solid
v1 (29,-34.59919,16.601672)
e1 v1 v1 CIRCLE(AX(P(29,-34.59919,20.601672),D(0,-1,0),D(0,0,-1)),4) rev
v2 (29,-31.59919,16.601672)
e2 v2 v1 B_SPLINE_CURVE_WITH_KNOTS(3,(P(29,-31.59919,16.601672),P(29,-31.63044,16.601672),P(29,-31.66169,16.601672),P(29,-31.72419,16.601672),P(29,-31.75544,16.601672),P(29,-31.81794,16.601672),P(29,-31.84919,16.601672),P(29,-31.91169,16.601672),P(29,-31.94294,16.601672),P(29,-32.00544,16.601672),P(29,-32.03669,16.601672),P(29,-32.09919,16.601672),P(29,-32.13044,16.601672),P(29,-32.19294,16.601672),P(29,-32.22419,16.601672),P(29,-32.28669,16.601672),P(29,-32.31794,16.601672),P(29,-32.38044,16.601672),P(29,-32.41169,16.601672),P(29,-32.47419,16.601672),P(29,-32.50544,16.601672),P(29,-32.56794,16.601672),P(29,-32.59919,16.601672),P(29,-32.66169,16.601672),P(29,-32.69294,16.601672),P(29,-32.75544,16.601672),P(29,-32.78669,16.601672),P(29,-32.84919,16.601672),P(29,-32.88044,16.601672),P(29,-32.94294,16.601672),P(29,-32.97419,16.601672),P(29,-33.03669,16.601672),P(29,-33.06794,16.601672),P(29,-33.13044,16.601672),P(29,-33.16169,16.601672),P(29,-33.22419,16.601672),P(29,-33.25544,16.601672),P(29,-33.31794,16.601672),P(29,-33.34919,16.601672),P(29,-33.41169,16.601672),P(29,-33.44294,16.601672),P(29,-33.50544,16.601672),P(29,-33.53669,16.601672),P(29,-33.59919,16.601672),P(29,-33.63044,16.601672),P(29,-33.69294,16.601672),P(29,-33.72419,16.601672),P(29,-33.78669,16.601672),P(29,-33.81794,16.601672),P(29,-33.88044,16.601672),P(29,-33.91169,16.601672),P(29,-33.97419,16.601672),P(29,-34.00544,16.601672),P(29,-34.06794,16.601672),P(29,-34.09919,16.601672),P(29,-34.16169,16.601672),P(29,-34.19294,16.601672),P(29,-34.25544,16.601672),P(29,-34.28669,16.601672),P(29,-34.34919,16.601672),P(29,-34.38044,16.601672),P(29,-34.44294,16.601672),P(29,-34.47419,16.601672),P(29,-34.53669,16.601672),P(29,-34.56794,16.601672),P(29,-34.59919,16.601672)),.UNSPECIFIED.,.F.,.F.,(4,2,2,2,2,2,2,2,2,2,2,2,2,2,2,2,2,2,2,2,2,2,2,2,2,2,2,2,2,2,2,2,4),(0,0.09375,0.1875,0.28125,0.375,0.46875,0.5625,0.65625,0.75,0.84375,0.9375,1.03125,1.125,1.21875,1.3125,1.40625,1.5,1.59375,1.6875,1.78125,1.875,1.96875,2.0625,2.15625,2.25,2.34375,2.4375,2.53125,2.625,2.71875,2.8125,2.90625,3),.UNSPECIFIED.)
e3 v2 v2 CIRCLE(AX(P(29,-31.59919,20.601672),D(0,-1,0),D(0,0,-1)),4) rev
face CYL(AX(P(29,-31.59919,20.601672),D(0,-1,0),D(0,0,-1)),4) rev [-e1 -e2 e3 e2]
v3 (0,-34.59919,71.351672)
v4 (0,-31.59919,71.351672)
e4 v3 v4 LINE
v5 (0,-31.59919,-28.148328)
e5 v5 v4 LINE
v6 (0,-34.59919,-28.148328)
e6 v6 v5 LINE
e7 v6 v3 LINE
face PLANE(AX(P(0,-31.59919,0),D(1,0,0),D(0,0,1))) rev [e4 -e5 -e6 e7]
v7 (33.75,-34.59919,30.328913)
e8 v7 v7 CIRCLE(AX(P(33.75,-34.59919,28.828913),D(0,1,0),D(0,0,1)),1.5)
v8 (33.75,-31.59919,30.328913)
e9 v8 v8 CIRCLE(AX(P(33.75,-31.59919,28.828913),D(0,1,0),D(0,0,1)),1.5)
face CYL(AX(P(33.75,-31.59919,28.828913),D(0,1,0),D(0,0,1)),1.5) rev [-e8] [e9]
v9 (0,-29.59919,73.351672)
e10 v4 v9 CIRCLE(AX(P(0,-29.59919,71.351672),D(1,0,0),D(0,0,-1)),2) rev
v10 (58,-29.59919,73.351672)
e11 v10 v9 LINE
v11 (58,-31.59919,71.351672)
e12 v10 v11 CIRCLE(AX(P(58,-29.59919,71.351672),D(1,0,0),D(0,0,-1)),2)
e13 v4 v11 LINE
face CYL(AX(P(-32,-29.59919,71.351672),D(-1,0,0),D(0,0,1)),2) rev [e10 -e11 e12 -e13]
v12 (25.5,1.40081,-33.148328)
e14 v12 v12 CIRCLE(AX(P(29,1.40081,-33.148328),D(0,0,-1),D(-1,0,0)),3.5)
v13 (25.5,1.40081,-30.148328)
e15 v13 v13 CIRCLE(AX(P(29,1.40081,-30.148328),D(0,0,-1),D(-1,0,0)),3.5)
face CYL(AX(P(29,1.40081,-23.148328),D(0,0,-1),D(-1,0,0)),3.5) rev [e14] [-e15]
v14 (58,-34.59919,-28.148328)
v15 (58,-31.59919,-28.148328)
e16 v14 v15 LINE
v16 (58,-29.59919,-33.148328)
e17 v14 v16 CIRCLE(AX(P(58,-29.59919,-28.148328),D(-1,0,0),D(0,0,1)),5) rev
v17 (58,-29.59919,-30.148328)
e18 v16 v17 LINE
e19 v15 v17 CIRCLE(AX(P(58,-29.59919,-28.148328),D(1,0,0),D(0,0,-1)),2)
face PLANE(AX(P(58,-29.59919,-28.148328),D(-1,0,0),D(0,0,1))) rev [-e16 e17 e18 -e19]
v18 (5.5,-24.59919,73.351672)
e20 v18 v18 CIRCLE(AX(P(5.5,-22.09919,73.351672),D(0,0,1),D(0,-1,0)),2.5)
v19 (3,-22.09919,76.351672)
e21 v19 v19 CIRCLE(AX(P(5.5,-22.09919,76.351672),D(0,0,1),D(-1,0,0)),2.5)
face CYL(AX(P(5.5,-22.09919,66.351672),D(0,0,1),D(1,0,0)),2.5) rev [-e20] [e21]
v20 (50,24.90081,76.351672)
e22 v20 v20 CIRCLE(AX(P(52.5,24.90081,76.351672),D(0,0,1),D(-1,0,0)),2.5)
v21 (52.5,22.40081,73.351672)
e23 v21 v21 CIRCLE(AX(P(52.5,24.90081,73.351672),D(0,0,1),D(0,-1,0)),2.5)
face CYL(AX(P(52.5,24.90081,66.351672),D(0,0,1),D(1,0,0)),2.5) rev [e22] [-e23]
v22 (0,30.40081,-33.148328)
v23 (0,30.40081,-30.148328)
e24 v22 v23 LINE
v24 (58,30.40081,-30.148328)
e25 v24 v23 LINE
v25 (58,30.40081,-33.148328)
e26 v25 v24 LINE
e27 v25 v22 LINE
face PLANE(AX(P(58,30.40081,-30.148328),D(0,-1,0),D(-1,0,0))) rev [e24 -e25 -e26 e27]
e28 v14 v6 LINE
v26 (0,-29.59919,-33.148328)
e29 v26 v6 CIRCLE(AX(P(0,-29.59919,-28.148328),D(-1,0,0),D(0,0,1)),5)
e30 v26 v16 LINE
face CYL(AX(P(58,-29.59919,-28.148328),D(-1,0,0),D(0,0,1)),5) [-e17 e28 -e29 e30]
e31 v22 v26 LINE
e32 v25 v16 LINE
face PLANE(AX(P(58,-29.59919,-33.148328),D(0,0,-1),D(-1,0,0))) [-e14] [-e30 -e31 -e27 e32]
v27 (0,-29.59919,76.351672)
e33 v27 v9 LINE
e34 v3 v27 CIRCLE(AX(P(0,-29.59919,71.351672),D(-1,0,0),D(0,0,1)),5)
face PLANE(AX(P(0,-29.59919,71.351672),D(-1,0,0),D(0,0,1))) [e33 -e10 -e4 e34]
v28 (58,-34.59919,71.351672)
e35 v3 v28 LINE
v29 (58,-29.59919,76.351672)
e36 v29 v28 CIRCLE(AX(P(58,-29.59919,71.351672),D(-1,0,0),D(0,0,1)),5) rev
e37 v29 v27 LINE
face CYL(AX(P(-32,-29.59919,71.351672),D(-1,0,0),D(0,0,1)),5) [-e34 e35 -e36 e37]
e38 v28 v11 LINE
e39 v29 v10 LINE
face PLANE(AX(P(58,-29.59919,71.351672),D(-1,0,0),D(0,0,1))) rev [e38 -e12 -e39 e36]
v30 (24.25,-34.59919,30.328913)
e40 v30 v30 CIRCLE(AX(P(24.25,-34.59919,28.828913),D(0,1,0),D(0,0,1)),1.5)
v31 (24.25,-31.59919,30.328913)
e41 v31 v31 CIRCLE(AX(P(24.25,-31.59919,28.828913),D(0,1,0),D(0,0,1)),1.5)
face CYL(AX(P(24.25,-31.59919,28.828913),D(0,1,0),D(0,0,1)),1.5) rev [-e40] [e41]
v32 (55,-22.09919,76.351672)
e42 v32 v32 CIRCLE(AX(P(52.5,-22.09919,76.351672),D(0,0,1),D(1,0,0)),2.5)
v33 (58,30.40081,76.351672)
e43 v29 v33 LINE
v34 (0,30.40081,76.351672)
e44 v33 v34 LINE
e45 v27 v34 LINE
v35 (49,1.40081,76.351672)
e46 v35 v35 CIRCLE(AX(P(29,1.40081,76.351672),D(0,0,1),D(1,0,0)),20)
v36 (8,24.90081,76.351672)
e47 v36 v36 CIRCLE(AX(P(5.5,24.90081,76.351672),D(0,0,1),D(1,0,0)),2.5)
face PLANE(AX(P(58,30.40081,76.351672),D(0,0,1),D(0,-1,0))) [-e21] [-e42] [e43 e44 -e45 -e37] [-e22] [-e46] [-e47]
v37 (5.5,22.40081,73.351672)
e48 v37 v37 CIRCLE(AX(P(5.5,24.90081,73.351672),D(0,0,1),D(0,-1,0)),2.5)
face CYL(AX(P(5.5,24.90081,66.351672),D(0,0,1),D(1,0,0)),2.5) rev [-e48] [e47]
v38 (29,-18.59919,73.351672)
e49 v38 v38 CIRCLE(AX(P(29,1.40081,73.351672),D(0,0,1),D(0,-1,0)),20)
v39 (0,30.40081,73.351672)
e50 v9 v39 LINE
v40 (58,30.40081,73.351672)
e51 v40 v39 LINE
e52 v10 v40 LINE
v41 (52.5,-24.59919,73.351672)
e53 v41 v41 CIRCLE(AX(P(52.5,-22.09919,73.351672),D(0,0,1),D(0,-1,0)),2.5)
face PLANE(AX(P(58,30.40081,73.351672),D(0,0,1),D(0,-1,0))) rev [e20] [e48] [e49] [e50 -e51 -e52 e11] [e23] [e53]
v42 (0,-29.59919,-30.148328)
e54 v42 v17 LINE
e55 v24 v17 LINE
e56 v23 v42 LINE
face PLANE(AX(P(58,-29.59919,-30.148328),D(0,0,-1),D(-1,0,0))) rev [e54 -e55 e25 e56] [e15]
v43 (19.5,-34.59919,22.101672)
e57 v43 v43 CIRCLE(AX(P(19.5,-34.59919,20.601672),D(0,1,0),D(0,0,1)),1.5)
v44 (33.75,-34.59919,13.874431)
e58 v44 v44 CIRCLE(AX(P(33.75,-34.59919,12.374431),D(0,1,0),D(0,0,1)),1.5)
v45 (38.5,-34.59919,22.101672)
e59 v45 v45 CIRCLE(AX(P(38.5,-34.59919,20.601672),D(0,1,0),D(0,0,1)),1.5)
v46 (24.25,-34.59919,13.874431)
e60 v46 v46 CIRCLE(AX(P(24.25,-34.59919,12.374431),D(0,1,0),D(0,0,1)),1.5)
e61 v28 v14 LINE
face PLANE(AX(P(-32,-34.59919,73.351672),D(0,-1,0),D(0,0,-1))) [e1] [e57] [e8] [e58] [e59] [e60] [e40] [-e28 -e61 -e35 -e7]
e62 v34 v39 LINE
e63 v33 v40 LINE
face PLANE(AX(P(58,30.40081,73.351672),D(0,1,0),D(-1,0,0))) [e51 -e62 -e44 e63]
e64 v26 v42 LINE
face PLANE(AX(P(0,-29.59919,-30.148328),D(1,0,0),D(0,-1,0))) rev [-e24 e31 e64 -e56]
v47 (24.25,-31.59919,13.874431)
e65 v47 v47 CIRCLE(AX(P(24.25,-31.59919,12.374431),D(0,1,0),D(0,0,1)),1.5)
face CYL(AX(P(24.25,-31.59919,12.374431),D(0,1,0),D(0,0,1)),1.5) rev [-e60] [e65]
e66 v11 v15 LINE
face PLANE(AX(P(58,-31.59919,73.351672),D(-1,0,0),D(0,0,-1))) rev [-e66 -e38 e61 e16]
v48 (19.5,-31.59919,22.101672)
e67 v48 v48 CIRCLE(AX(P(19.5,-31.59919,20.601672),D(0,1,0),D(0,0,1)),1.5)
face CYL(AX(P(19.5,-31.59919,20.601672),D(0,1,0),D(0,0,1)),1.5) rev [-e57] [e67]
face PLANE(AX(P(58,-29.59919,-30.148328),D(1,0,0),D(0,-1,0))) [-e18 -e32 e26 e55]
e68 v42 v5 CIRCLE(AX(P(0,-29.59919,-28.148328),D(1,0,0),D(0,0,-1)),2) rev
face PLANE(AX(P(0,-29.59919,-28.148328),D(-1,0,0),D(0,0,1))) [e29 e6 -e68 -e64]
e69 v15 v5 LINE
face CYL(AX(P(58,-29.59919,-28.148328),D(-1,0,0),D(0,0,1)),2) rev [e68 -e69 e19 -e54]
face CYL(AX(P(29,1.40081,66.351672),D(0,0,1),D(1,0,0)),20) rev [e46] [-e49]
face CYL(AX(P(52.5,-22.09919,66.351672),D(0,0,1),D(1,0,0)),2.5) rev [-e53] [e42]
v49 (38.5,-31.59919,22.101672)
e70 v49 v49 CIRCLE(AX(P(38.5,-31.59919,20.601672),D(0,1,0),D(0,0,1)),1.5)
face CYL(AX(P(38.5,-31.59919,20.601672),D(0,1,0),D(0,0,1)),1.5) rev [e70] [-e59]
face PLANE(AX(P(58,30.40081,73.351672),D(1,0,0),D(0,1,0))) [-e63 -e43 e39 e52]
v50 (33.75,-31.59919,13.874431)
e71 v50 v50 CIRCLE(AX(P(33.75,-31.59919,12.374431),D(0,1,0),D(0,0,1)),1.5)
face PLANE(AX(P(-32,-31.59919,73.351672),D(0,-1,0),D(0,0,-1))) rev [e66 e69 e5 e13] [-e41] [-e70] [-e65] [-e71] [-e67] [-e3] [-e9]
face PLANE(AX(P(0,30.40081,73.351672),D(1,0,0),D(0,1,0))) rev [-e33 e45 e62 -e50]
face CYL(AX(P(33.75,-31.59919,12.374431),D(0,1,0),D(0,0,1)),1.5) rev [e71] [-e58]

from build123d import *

# Parameters (mm, degrees)
BOSS_EXTRUDE1_DEPTH    = 58
SKETCH25_R             = 4
CUT_EXTRUDE6_DEPTH     = 10
SKETCH26_W             = 103.5
SKETCH26_H             = 2
CUT_EXTRUDE7_DEPTH     = 90
SKETCH29_R             = 1.5
CUT_EXTRUDE8_DEPTH     = 10
CONVERT_SOLID1_DEPTH   = 58
CONVERT_SOLID1_2_DEPTH = 58
SKETCH2_R              = 2.5
SKETCH2_R_2            = 20
CUT_EXTRUDE10_DEPTH    = 10
SKETCH30_R             = 3.5
CUT_EXTRUDE11_DEPTH    = 10


# Read off the part's stored shape, not the designer's step: Convert-Solid1
with BuildPart() as part:
    # Sketch1 → Boss-Extrude1 (new body)
    with BuildSketch(Plane(origin=(0, 0, 0), x_dir=(0, 0, -1), z_dir=(1, 0, 0))):
        Polygon((-73.351671883, 30.400809615), (-73.351671883, -29.599190385), (30.148328117, -29.599190385), (30.148328117, 30.400809615), (33.148328117, 30.400809615), (33.148328117, -34.599190385), (-76.351671883, -34.599190385), (-76.351671883, 30.400809615), align=None)
    extrude(amount=BOSS_EXTRUDE1_DEPTH)

    # Sketch25 → Cut-Extrude6 (cut)
    with BuildSketch(Plane.XZ.offset(34.599190385)):
        with Locations(Location((29, 20.601671883, 0), (0, 0, 270))):
            Circle(SKETCH25_R)
    extrude(amount=-CUT_EXTRUDE6_DEPTH, mode=Mode.SUBTRACT)

    # Sketch26 → Cut-Extrude7 (cut)
    with BuildSketch(Plane(origin=(58, 0, 0), x_dir=(0, 0, -1), z_dir=(1, 0, 0))):
        with Locations((-21.601671883, -30.599190385)):
            Rectangle(SKETCH26_W, SKETCH26_H)
    extrude(amount=-CUT_EXTRUDE7_DEPTH, mode=Mode.SUBTRACT)

    # Sketch29 → Cut-Extrude8 (cut)
    with BuildSketch(Plane(origin=(0, -31.599190385, 0), x_dir=(1, 0, 0), z_dir=(0, 1, 0))):
        with Locations(Location((19.5, -20.601671883, 0), (0, 0, 270))):
            Circle(SKETCH29_R)
        with Locations(Location((24.25, -12.374430547, 0), (0, 0, 270))):
            Circle(SKETCH29_R)
        with Locations(Location((33.75, -12.374430547, 0), (0, 0, 270))):
            Circle(SKETCH29_R)
        with Locations(Location((38.5, -20.601671883, 0), (0, 0, 270))):
            Circle(SKETCH29_R)
        with Locations(Location((33.75, -28.828913219, 0), (0, 0, 270))):
            Circle(SKETCH29_R)
        with Locations(Location((24.25, -28.828913219, 0), (0, 0, 270))):
            Circle(SKETCH29_R)
    extrude(amount=-CUT_EXTRUDE8_DEPTH, mode=Mode.SUBTRACT)

    # Convert-Solid1 outline → Convert-Solid1 (cut)
    with BuildSketch(Plane.YZ):
        with BuildLine():
            Line((-34.599190385, -33.148328117), (-29.599190385, -33.148328117))
            ThreePointArc((-29.599190385, -33.148328117), (-33.134724291, -31.683862023), (-34.599190385, -28.148328117))
            Line((-34.599190385, -28.148328117), (-34.599190385, -33.148328117))
        make_face()
        with BuildLine():
            Line((-34.599190385, 76.351671883), (-34.599190385, 71.351671883))
            ThreePointArc((-34.599190385, 71.351671883), (-33.134724291, 74.887205789), (-29.599190385, 76.351671883))
            Line((-29.599190385, 76.351671883), (-34.599190385, 76.351671883))
        make_face()
    extrude(amount=CONVERT_SOLID1_DEPTH, mode=Mode.SUBTRACT)

    # Convert-Solid1 2 outline → Convert-Solid1 2 (add)
    with BuildSketch(Plane.YZ):
        with BuildLine():
            Line((-31.599190385, -30.148328117), (-29.599190385, -30.148328117))
            ThreePointArc((-29.599190385, -30.148328117), (-31.013403947, -29.56254168), (-31.599190385, -28.148328117))
            Line((-31.599190385, -28.148328117), (-31.599190385, -30.148328117))
        make_face()
        with BuildLine():
            Line((-31.599190385, 73.351671883), (-31.599190385, 71.351671883))
            ThreePointArc((-31.599190385, 71.351671883), (-31.013403947, 72.765885445), (-29.599190385, 73.351671883))
            Line((-29.599190385, 73.351671883), (-31.599190385, 73.351671883))
        make_face()
    extrude(amount=CONVERT_SOLID1_2_DEPTH)

    # Sketch2 → Cut-Extrude10 (cut)
    with BuildSketch(Plane.XY.offset(76.351671883)):
        with Locations((5.5, 24.900809615)):
            Circle(SKETCH2_R)
        with Locations(Location((52.5, 24.900809615, 0), (0, 0, 270))):
            Circle(SKETCH2_R)
        with Locations((52.5, -22.099190385)):
            Circle(SKETCH2_R)
        with Locations(Location((5.5, -22.099190385, 0), (0, 0, 270))):
            Circle(SKETCH2_R)
        with Locations((29, 1.400809615)):
            Circle(SKETCH2_R_2)
    extrude(amount=-CUT_EXTRUDE10_DEPTH, mode=Mode.SUBTRACT)

    # Sketch30 → Cut-Extrude11 (cut)
    with BuildSketch(Plane(origin=(0, 0, -33.148328117), x_dir=(-1, 0, 0), z_dir=(0, 0, -1))):
        with Locations((-29, 1.400809615)):
            Circle(SKETCH30_R)
    extrude(amount=-CUT_EXTRUDE11_DEPTH, mode=Mode.SUBTRACT)


solid = part.part
